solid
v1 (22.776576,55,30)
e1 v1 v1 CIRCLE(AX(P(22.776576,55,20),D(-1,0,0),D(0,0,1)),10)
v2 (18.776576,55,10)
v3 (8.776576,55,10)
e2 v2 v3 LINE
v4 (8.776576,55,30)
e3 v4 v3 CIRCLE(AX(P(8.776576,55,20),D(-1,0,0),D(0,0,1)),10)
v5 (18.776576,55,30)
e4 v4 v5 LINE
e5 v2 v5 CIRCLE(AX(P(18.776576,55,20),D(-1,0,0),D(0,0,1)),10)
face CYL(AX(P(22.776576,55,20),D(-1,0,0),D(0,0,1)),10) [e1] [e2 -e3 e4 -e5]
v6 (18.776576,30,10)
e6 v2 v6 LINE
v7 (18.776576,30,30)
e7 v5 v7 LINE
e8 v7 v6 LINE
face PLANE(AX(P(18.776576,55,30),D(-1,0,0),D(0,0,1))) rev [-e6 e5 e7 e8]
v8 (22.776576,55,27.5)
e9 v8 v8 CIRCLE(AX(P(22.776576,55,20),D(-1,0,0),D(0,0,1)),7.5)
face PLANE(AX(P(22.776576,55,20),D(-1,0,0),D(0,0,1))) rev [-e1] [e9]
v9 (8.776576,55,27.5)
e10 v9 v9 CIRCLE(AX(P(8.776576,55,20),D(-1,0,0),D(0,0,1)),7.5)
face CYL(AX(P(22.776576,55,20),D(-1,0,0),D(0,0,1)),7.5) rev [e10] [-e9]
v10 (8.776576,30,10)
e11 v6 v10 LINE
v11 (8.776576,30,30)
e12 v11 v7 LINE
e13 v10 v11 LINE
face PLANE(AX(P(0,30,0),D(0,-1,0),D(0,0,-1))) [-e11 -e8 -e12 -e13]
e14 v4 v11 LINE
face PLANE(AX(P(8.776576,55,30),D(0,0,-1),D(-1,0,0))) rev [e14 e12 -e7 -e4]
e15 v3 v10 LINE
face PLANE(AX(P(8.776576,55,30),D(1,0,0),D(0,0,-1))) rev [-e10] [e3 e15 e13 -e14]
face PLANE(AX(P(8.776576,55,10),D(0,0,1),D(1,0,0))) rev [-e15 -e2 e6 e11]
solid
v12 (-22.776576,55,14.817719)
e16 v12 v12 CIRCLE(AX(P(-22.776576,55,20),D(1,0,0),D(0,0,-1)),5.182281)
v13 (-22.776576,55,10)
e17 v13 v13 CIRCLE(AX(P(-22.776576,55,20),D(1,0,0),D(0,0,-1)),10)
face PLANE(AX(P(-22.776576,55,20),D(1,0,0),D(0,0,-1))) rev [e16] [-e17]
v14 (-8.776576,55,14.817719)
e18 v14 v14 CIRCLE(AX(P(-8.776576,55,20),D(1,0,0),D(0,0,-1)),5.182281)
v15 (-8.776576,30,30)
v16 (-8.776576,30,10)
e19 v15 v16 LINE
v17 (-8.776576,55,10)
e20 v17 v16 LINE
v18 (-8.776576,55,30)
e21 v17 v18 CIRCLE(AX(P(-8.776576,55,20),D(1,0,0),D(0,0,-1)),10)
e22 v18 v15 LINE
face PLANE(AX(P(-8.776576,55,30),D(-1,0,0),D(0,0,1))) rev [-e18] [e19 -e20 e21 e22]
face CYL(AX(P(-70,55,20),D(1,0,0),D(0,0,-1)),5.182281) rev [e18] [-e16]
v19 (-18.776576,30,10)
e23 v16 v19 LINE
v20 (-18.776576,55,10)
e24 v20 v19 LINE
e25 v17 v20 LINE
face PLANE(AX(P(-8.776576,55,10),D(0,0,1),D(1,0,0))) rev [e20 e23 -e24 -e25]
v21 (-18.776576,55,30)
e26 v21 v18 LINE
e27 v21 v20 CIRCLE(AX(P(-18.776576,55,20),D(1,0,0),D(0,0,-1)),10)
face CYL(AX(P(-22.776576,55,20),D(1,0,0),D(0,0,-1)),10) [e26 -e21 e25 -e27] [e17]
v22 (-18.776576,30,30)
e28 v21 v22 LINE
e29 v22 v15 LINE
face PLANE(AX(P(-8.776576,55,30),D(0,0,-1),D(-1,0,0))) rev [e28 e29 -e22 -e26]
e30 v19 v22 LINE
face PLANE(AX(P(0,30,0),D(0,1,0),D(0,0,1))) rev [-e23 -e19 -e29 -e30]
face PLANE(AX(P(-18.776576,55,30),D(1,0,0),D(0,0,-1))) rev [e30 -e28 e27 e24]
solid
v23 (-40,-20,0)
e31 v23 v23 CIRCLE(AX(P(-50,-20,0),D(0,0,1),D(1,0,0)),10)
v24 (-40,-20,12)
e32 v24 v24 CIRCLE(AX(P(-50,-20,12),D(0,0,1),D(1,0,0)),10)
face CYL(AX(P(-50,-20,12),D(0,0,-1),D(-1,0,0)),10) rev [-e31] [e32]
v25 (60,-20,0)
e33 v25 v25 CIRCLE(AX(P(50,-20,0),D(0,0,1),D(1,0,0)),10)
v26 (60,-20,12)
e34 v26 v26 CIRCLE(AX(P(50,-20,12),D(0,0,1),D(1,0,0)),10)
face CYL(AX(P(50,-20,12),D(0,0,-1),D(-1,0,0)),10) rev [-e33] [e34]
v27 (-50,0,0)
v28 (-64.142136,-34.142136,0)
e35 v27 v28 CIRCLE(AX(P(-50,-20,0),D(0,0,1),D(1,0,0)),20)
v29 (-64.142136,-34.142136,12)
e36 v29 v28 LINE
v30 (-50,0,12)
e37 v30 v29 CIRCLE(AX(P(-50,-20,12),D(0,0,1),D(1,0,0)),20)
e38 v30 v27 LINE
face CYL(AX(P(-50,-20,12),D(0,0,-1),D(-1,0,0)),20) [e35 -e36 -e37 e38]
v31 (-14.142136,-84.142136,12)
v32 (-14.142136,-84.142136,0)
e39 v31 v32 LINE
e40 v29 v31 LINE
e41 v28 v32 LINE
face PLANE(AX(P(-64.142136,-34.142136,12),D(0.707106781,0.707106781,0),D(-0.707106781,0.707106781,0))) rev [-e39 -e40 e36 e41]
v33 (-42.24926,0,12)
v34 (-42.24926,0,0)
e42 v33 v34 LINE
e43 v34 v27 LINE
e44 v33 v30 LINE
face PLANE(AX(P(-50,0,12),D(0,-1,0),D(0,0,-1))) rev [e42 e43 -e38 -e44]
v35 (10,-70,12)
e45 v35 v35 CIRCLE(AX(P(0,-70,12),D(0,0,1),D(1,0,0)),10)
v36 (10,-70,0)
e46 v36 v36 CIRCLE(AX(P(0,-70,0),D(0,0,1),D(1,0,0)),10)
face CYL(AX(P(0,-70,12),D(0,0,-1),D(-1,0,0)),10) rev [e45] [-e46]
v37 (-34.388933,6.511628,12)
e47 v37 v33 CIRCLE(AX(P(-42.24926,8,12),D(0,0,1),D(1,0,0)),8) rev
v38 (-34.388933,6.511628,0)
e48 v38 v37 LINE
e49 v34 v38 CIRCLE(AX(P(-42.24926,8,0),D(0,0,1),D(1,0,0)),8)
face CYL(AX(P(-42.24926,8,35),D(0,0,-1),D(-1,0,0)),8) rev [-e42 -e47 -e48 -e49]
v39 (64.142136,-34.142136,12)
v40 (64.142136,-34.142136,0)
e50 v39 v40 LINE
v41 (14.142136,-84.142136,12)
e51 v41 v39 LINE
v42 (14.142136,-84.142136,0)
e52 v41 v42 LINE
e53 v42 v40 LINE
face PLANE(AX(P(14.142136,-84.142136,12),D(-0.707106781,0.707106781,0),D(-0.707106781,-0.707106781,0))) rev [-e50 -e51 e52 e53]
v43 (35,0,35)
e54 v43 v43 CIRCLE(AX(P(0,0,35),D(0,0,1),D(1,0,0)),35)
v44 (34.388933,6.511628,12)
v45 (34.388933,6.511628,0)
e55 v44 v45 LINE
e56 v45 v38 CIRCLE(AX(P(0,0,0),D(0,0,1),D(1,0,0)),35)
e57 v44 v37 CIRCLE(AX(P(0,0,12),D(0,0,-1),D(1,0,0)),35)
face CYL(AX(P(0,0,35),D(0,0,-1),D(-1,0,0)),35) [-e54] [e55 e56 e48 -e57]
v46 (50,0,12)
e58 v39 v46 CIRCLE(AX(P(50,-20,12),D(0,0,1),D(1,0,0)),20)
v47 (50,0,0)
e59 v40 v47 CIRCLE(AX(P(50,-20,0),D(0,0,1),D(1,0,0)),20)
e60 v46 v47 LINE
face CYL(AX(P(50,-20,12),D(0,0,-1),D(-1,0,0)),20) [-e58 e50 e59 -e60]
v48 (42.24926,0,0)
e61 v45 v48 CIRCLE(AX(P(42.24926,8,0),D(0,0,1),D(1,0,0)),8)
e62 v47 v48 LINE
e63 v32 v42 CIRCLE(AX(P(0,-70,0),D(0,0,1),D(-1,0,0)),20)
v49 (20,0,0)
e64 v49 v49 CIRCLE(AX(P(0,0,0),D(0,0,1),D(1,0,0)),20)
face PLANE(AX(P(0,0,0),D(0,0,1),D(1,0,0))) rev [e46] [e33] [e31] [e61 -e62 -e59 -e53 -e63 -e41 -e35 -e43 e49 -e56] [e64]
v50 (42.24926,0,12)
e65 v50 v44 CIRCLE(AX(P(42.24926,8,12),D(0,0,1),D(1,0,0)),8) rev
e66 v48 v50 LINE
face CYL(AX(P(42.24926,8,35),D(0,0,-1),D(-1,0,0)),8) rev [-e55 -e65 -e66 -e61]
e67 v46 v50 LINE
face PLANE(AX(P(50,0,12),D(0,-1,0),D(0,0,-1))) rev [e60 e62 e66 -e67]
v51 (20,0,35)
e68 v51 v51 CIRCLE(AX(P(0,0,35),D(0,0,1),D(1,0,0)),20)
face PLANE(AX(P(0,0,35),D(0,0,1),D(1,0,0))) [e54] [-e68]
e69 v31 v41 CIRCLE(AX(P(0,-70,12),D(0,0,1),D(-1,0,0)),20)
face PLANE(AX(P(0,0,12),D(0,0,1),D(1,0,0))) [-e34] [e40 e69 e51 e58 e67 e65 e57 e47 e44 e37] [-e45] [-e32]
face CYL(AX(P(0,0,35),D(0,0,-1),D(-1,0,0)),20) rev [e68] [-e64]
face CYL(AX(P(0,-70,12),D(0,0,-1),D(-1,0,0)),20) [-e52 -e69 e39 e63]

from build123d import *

# Parameters (mm, degrees)
ESQUISSE1_R             = 35
ESQUISSE1_R_2           = 20
BOSS_EXTRU_1_DEPTH      = 35
ESQUISSE2_R             = 10
BOSS_EXTRU_2_DEPTH      = 12
CONG_1_R                = 8
ESQUISSE4_W             = 10
ESQUISSE4_H             = 20
BOSS_EXTRU_3_DEPTH      = 25
BOSS_EXTRU_3_2_DEPTH    = 25
ESQUISSE6_R             = 10
BOSS_EXTRU_4_DEPTH      = 14
ESQUISSE8_R             = 5.182281133
ENL_V_MAT_EXTRU_1_DEPTH = 125.622425432
ESQUISSE14_R            = 10
BOSS_EXTRU_5_DEPTH      = 14
ESQUISSE15_R            = 7.5
ENL_V_MAT_EXTRU_2_DEPTH = 14


with BuildPart() as part:
    # Esquisse1 → Boss.-Extru.1 (new body)
    with BuildSketch(Plane.XY):
        Circle(ESQUISSE1_R)
        Circle(ESQUISSE1_R_2, mode=Mode.SUBTRACT)
    extrude(amount=BOSS_EXTRU_1_DEPTH)

    # Esquisse2 → Boss.-Extru.2 (add)
    with BuildSketch(Plane.XY):
        with BuildLine():
            Line((14.142135624, -84.142135624), (64.142135624, -34.142135624))
            ThreePointArc((64.142135624, -34.142135624), (68.47759065, -12.346331353), (50, 0))
            Line((50, 0), (35, 0))
            ThreePointArc((35, 0), (0, -35), (-35, 0))
            Line((-35, 0), (-50, 0))
            ThreePointArc((-50, 0), (-68.47759065, -12.346331353), (-64.142135624, -34.142135624))
            Line((-64.142135624, -34.142135624), (-14.142135624, -84.142135624))
            ThreePointArc((-14.142135624, -84.142135624), (0, -90), (14.142135624, -84.142135624))
        make_face()
        with Locations((50, -20)):
            Circle(ESQUISSE2_R, mode=Mode.SUBTRACT)
        with Locations((0, -70)):
            Circle(ESQUISSE2_R, mode=Mode.SUBTRACT)
        with Locations((-50, -20)):
            Circle(ESQUISSE2_R, mode=Mode.SUBTRACT)
    extrude(amount=BOSS_EXTRU_2_DEPTH)

    # Congé1
    # the kernel refuses this fillet: 8 mm, written as the material it adds along each edge
    with BuildSketch(Plane(origin=(35, 0, 0), x_dir=(-0.09343195829454301, 0.9956256671908608, 0), z_dir=(0, 0, 1))) as cong_1_piece_1:
        with BuildLine():
            CenterArc((7.287692747, -7.965005338), CONG_1_R, 95.361076208, 79.277847584)
            Line((-0.677312591, -7.217549671), (0, 0))
            ThreePointArc((0, 0), (3.27011854, -0.153101648), (6.540237081, 0))
        make_face()
    extrude(amount=12)
    with BuildSketch(Plane(origin=(-35, 0, 0), x_dir=(0.093431958294544, 0.9956256671908608, 0), z_dir=(0, 0, 1))) as cong_1_piece_2:
        with BuildLine():
            CenterArc((7.287692747, 7.965005338), CONG_1_R, 185.361076208, 79.277847584)
            Line((-0.677312591, 7.217549671), (0, 0))
            ThreePointArc((0, 0), (3.27011854, 0.153101648), (6.540237081, 0))
        make_face()
    extrude(amount=12)


with BuildPart() as body_2:
    # Esquisse4 → Boss.-Extru.3 (new body)
    with BuildSketch(Plane(origin=(0, 30, 0), x_dir=(1, 0, 0), z_dir=(0, 1, 0))):
        with Locations((13.776575964, -20)):
            Rectangle(ESQUISSE4_W, ESQUISSE4_H)
    extrude(amount=BOSS_EXTRU_3_DEPTH)

    # Esquisse14 → Boss.-Extru.5 (add)
    with BuildSketch(Plane.ZY.offset(-8.776575964)):
        with Locations(Location((20, 55, 0), (0, 0, 180))):
            Circle(ESQUISSE14_R)
    extrude(amount=-BOSS_EXTRU_5_DEPTH)

    # Esquisse15 → Enlèv. mat.-Extru.2 (cut)
    with BuildSketch(Plane.ZY.offset(-8.776575964)):
        with Locations((20, 55)):
            Circle(ESQUISSE15_R)
    extrude(amount=-ENL_V_MAT_EXTRU_2_DEPTH, mode=Mode.SUBTRACT)


with BuildPart() as body_3:
    # Esquisse4 → Boss.-Extru.3 2 (new body)
    with BuildSketch(Plane(origin=(0, 30, 0), x_dir=(1, 0, 0), z_dir=(0, 1, 0))):
        with Locations((-13.776575964, -20)):
            Rectangle(ESQUISSE4_W, ESQUISSE4_H)
    extrude(amount=BOSS_EXTRU_3_2_DEPTH)

    # Esquisse6 → Boss.-Extru.4 (add)
    with BuildSketch(Plane(origin=(-8.776575964, 0, 0), x_dir=(0, 0, -1), z_dir=(1, 0, 0))):
        with Locations((-20, 55)):
            Circle(ESQUISSE6_R)
    extrude(amount=-BOSS_EXTRU_4_DEPTH)

    # Esquisse8 → Enlèv. mat.-Extru.1 (cut, through all)
    with BuildSketch(Plane(origin=(-8.776575964, 0, 0), x_dir=(0, 0, -1), z_dir=(1, 0, 0))):
        with Locations((-20, 55)):
            Circle(ESQUISSE8_R)
    extrude(amount=-ENL_V_MAT_EXTRU_1_DEPTH, mode=Mode.SUBTRACT)


solid = Compound([part.part, body_2.part, body_3.part])
